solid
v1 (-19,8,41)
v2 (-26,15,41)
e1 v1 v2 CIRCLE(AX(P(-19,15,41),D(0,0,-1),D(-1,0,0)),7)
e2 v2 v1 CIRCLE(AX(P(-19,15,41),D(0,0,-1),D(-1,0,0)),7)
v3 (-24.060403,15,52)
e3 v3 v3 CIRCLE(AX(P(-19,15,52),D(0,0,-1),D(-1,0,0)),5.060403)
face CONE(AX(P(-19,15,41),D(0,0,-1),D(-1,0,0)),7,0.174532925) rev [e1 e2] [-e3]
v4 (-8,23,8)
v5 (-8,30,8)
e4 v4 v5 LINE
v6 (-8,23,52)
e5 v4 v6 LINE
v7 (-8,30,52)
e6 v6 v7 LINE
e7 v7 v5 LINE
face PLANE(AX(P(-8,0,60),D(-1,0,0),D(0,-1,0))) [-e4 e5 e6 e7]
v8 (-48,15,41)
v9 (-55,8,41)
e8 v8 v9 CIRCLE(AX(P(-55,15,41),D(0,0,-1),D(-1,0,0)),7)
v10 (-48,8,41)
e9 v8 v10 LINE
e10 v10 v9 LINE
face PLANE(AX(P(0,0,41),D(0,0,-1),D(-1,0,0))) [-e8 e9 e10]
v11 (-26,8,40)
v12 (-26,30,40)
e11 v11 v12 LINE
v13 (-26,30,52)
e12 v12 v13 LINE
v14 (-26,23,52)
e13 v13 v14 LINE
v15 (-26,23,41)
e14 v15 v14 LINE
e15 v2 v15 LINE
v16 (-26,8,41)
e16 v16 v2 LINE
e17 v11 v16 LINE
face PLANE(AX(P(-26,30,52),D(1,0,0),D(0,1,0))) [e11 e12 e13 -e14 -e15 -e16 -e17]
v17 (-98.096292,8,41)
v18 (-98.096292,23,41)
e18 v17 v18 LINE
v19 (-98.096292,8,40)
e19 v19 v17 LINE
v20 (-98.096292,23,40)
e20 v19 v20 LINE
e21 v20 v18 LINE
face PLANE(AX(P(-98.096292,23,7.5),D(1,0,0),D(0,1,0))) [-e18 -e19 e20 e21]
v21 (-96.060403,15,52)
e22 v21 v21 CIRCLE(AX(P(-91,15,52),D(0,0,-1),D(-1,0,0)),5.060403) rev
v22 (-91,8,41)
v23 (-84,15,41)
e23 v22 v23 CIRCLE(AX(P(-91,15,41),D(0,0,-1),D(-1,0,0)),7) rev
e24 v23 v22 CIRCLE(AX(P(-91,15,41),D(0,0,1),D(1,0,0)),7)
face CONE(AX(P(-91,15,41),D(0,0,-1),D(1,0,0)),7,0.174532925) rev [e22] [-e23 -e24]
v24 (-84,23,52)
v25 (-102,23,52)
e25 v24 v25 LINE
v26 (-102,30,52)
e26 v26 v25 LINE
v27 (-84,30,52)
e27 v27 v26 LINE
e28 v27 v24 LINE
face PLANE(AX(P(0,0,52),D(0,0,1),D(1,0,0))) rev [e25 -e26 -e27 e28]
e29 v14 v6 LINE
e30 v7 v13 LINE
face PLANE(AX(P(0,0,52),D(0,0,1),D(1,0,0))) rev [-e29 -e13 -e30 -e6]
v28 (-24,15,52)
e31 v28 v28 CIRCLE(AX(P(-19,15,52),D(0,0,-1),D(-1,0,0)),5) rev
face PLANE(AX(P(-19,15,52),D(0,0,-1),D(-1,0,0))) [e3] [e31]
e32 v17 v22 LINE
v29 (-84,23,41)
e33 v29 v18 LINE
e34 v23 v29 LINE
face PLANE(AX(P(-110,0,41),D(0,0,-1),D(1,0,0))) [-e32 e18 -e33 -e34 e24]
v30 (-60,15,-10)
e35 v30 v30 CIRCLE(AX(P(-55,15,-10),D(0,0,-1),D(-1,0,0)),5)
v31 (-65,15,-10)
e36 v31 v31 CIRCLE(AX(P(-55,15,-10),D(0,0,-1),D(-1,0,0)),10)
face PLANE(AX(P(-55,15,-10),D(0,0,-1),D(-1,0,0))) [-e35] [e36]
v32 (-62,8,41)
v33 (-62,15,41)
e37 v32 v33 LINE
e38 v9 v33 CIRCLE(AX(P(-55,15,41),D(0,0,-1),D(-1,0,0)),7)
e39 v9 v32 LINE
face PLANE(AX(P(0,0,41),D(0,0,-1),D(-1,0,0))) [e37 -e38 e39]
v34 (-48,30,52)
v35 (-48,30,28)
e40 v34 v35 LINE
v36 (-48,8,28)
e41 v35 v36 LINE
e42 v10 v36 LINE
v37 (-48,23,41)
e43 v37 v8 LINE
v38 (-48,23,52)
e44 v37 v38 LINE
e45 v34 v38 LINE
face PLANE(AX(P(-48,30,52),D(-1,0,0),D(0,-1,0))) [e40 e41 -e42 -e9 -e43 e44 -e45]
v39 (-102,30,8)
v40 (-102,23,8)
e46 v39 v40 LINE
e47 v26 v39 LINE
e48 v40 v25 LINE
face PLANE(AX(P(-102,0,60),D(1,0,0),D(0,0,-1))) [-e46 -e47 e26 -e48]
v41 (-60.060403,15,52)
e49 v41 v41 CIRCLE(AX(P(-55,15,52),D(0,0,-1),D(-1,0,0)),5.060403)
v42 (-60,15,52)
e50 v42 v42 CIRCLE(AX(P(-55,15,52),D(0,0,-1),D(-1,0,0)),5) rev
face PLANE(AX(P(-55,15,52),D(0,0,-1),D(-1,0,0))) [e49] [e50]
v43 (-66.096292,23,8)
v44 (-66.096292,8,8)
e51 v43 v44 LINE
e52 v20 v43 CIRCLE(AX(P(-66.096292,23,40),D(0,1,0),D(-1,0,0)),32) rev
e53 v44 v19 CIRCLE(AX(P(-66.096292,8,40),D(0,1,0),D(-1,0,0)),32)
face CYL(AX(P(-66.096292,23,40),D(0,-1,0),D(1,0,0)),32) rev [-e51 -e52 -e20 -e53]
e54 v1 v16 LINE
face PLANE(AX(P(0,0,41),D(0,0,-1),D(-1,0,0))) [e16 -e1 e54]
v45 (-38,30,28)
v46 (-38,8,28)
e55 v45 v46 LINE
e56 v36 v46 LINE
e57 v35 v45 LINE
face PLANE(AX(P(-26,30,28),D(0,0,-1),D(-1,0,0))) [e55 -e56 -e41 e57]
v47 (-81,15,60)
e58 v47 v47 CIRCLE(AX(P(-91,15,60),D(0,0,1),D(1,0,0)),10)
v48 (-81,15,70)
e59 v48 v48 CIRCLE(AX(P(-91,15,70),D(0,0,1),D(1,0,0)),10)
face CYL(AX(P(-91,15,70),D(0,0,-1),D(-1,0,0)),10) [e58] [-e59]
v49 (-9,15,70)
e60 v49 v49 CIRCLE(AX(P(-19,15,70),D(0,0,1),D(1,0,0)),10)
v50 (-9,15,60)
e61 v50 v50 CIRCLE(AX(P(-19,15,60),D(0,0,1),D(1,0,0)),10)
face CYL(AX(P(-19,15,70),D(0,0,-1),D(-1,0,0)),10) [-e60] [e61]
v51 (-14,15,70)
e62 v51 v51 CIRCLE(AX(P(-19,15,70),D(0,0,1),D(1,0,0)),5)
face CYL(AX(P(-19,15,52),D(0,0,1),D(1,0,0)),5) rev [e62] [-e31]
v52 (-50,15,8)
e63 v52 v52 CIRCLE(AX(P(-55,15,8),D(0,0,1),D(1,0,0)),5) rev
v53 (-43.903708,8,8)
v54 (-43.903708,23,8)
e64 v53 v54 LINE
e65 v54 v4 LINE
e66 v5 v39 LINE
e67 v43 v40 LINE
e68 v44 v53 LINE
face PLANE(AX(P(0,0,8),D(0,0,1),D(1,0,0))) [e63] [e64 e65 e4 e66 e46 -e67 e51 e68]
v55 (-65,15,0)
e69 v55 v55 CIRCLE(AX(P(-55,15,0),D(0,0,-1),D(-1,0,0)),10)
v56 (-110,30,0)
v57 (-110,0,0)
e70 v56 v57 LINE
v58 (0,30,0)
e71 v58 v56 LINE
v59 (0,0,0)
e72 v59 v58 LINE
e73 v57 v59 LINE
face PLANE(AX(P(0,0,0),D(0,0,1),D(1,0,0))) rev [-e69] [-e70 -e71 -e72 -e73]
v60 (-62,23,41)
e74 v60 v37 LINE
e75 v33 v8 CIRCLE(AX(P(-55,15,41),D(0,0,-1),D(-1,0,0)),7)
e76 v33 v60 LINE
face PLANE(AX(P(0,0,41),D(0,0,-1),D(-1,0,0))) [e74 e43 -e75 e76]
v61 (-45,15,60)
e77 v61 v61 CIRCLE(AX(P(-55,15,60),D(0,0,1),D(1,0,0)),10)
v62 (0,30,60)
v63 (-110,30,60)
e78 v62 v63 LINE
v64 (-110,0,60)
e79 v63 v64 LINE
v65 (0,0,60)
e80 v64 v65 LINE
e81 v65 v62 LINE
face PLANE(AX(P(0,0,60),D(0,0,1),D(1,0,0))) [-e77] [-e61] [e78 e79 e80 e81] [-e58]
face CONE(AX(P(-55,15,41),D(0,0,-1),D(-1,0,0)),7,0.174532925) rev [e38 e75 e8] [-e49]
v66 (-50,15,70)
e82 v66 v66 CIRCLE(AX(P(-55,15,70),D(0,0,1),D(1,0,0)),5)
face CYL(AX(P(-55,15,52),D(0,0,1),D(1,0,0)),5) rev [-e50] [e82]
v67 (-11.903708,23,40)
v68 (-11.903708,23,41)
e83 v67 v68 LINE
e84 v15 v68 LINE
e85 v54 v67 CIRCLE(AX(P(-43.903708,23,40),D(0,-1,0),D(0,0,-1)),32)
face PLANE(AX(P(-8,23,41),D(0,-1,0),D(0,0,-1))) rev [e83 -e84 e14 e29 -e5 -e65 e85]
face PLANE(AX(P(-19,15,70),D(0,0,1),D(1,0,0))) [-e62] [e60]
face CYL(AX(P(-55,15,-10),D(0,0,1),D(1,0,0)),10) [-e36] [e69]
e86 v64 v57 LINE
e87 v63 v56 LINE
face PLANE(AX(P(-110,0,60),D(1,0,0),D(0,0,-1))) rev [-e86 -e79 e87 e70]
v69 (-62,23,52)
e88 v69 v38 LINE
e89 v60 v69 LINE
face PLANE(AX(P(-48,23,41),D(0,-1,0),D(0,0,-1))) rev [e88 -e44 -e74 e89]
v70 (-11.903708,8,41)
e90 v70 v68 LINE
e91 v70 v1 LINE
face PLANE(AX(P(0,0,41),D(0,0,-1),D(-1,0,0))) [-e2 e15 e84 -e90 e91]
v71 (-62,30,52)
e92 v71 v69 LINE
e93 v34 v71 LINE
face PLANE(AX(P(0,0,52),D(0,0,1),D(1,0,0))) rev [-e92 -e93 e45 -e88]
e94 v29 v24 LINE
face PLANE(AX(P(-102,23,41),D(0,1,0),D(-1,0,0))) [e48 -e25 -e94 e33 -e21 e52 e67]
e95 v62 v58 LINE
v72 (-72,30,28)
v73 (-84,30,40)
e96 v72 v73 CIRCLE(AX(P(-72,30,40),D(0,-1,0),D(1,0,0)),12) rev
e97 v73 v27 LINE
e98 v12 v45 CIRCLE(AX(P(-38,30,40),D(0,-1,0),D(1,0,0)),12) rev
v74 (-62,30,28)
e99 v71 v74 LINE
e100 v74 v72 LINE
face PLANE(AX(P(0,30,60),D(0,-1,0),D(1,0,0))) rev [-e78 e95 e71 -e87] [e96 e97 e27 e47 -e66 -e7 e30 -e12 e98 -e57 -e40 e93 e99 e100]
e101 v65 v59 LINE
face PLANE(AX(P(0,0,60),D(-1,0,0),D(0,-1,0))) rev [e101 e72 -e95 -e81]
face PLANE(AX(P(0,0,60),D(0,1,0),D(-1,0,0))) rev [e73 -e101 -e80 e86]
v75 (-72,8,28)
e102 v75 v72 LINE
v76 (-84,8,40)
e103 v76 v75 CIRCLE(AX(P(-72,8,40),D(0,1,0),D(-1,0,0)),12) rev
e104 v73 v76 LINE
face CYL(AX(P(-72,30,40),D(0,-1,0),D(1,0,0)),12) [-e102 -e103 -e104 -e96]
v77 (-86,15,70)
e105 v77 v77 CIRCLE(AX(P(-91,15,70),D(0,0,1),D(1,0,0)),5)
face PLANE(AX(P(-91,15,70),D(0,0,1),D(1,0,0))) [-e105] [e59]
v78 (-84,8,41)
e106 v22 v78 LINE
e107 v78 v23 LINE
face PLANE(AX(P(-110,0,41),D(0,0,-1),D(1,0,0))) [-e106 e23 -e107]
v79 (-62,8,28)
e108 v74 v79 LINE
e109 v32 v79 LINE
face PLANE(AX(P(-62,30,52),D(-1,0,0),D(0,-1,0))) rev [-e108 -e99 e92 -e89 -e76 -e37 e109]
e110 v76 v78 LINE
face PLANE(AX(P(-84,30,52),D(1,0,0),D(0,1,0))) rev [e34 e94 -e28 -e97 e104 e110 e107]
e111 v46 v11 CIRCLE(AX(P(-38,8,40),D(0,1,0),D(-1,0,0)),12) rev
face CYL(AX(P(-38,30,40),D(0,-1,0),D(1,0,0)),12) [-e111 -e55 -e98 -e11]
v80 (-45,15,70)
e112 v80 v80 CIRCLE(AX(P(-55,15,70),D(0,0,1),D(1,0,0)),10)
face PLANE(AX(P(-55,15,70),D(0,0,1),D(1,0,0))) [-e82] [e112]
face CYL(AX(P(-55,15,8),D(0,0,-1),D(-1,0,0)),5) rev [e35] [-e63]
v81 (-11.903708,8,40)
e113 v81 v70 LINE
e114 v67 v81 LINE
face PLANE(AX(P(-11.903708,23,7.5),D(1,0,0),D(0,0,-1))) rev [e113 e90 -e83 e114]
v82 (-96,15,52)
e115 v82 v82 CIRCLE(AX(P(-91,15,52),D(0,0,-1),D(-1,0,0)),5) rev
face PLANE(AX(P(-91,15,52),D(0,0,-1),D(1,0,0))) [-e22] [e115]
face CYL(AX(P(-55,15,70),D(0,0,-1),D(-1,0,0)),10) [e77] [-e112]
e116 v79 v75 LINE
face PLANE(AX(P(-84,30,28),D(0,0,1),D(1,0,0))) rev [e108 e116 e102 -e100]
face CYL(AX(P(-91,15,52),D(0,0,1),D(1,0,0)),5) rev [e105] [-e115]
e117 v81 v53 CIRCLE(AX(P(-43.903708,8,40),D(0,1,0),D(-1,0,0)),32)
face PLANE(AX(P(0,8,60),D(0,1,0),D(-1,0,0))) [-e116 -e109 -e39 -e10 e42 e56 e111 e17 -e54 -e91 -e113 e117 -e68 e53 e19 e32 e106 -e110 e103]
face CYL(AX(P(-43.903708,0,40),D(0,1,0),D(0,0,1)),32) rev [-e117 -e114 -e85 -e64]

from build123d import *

# Parameters (mm, degrees)
SKETCH1_W               = 110
SKETCH1_H               = 30
BOSS_EXTRUDE1_DEPTH     = 60
SKETCH5_R               = 10
BOSS_EXTRUDE3_DEPTH     = 10
SKETCH8_R               = 5
CUT_EXTRUDE2_DEPTH      = 18
BOSS_EXTRUDE4_START     = 10
SKETCH6_R               = 10
BOSS_EXTRUDE4_DEPTH     = 10
CUT_EXTRUDE3_START      = -18
SKETCH7_R               = 5
CUT_EXTRUDE3_DEPTH      = 18
SHELL6_START            = 8
SHELL6_OUTLINE_W        = 94
SHELL6_OUTLINE_H        = 22
SHELL6_DEPTH            = 44
SKETCH9_W               = 22
SKETCH9_H               = 24
BOSS_EXTRUDE5_DEPTH     = 22
FILLET2_R               = 12
SKETCH12_W              = 14
SKETCH12_H              = 16
BOSS_EXTRUDE8_DEPTH     = 11
SKETCH13_R              = 7
CUT_EXTRUDE4_DEPTH      = 11
CUT_EXTRUDE4_DRAFT      = -10
SKETCH14_W              = 18
SKETCH14_H              = 15
BOSS_EXTRUDE9_DEPTH     = 11
SKETCH16_R              = 7
CUT_EXTRUDE5_DEPTH      = 11
CUT_EXTRUDE5_DRAFT      = -10
SKETCH19_W              = 3.903707596
SKETCH19_H              = 15
BOSS_EXTRUDE11_DEPTH    = 33.5
FILLET3_R               = 32
MIRROR5_COPY_1_SKETCH_R = 7
MIRROR5_COPY_1_DEPTH    = 11
MIRROR5_COPY_1_DRAFT    = -10
FILLET3_OF_MIRROR5_R    = 32


# Read off the part's stored shape, not the designer's step: Shell6
with BuildPart() as part:
    # Sketch1 → Boss-Extrude1 (new body)
    with BuildSketch(Plane.XY):
        with Locations((-55, 15)):
            Rectangle(SKETCH1_W, SKETCH1_H)
    extrude(amount=BOSS_EXTRUDE1_DEPTH)

    # Sketch5 → Boss-Extrude3 (add)
    with BuildSketch(Plane.XY.offset(60)):
        with Locations((-91, 15)):
            Circle(SKETCH5_R)
        with Locations((-55, 15)):
            Circle(SKETCH5_R)
        with Locations((-19, 15)):
            Circle(SKETCH5_R)
    extrude(amount=BOSS_EXTRUDE3_DEPTH)

    # Sketch8 → Cut-Extrude2 (cut)
    with BuildSketch(Plane.XY.offset(70)):
        with Locations((-91, 15)):
            Circle(SKETCH8_R)
        with Locations((-55, 15)):
            Circle(SKETCH8_R)
        with Locations((-19, 15)):
            Circle(SKETCH8_R)
    extrude(amount=-CUT_EXTRUDE2_DEPTH, mode=Mode.SUBTRACT)

    # Sketch6 → Boss-Extrude4 (add)
    with BuildSketch(Plane(origin=(0, 0, 0), x_dir=(-1, 0, 0), z_dir=(0, 0, -1)).offset(BOSS_EXTRUDE4_START)):
        with Locations(Location((55, 15, 0), (0, 0, 180))):
            Circle(SKETCH6_R)
    extrude(amount=-BOSS_EXTRUDE4_DEPTH)

    # Sketch7 → Cut-Extrude3 (cut)
    with BuildSketch(Plane(origin=(0, 0, -10), x_dir=(-1, 0, 0), z_dir=(0, 0, -1)).offset(CUT_EXTRUDE3_START)):
        with Locations(Location((55, 15, 0), (0, 0, 180))):
            Circle(SKETCH7_R)
    extrude(amount=CUT_EXTRUDE3_DEPTH, mode=Mode.SUBTRACT)

    # Shell6 outline → Shell6 (cut)
    with BuildSketch(Plane.XY.offset(SHELL6_START)):
        with Locations((-55, 19)):
            Rectangle(SHELL6_OUTLINE_W, SHELL6_OUTLINE_H)
    extrude(amount=SHELL6_DEPTH, mode=Mode.SUBTRACT)

    # Sketch9 → Boss-Extrude5 (add)
    with BuildSketch(Plane(origin=(0, 8, 0), x_dir=(1, 0, 0), z_dir=(0, 1, 0))):
        with Locations((-73, -40)):
            Rectangle(SKETCH9_W, SKETCH9_H)
    boss_extrude5 = extrude(amount=BOSS_EXTRUDE5_DEPTH)

    # Mirror1: Boss-Extrude5 across plane
    add(boss_extrude5.mirror(Plane.ZY.offset(55)))

    # Fillet2
    fillet2_edges = [part.edges().sort_by_distance(p)[0] for p in [
        (-84, 19, 28),
        (-26, 19, 28),
    ]]
    fillet(fillet2_edges, radius=FILLET2_R)

    # Sketch12 → Boss-Extrude8 (add)
    with BuildSketch(Plane(origin=(0, 0, 52), x_dir=(-1, 0, 0), z_dir=(0, 0, -1))):
        with Locations((55, 15)):
            Rectangle(SKETCH12_W, SKETCH12_H)
    extrude(amount=BOSS_EXTRUDE8_DEPTH)


with BuildPart() as cut_extrude4_tool:
    # Sketch13 → Cut-Extrude4 (with draft: the straight prism first)
    with BuildSketch(Plane(origin=(0, 0, 41), x_dir=(-1, 0, 0), z_dir=(0, 0, -1))):
        with Locations((55, 15)):
            Circle(SKETCH13_R)
    extrude(amount=-CUT_EXTRUDE4_DEPTH)
    # Cut-Extrude4: the draft: its side faces are tilted about the plane it starts from
    cut_extrude4_sides = [cut_extrude4_tool.faces().sort_by_distance(p)[0] for p in [
        (-48, 15, 46.5),
    ]]
    draft(cut_extrude4_sides, Plane(origin=(0, 0, 41), x_dir=(-1, 0, 0), z_dir=(0, 0, -1)), CUT_EXTRUDE4_DRAFT)


with BuildPart() as part_1:
    add(part.part)

    # Cut-Extrude4: cut by cut_extrude4_tool
    add(cut_extrude4_tool.part, mode=Mode.SUBTRACT)

    # Sketch14 → Boss-Extrude9 (add)
    with BuildSketch(Plane(origin=(0, 0, 52), x_dir=(-1, 0, 0), z_dir=(0, 0, -1))):
        with Locations((17, 15.5)):
            Rectangle(SKETCH14_W, SKETCH14_H)
    boss_extrude9 = extrude(amount=BOSS_EXTRUDE9_DEPTH)


with BuildPart() as cut_extrude5_tool:
    # Sketch16 → Cut-Extrude5 (with draft: the straight prism first)
    with BuildSketch(Plane(origin=(0, 0, 41), x_dir=(-1, 0, 0), z_dir=(0, 0, -1))):
        with Locations((19, 15)):
            Circle(SKETCH16_R)
    extrude(amount=-CUT_EXTRUDE5_DEPTH)
    # Cut-Extrude5: the draft: its side faces are tilted about the plane it starts from
    cut_extrude5_sides = [cut_extrude5_tool.faces().sort_by_distance(p)[0] for p in [
        (-12, 15, 46.5),
    ]]
    draft(cut_extrude5_sides, Plane(origin=(0, 0, 41), x_dir=(-1, 0, 0), z_dir=(0, 0, -1)), CUT_EXTRUDE5_DRAFT)


with BuildPart() as part_2:
    add(part_1.part)

    # Cut-Extrude5: cut by cut_extrude5_tool
    add(cut_extrude5_tool.part, mode=Mode.SUBTRACT)

    # Sketch19 → Boss-Extrude11 (add)
    with BuildSketch(Plane(origin=(0, 0, 41), x_dir=(-1, 0, 0), z_dir=(0, 0, -1))):
        with Locations((9.951853798, 15.5)):
            Rectangle(SKETCH19_W, SKETCH19_H)
    boss_extrude11 = extrude(amount=BOSS_EXTRUDE11_DEPTH)

    # Fillet3
    fillet3_edges = [part_2.edges().sort_by_distance(p)[0] for p in [
        (-11.903707596, 15.5, 8),
    ]]
    fillet(fillet3_edges, radius=FILLET3_R)

    # Mirror5: Boss-Extrude9, Boss-Extrude11 across plane
    add(boss_extrude9.mirror(Plane.ZY.offset(55)))
    add(boss_extrude11.mirror(Plane.ZY.offset(55)))


with BuildPart() as mirror5_copy_1_tool:
    # Mirror5 copy 1 sketch → Mirror5 copy 1 (with draft: the straight prism first)
    with BuildSketch(Plane(origin=(-110, 0, 41), x_dir=(1, 0, 0), z_dir=(0, 0, -1))):
        with Locations((19, -15)):
            Circle(MIRROR5_COPY_1_SKETCH_R)
    extrude(amount=-MIRROR5_COPY_1_DEPTH)
    # Mirror5 copy 1: the draft: its side faces are tilted about the plane it starts from
    mirror5_copy_1_sides = [mirror5_copy_1_tool.faces().sort_by_distance(p)[0] for p in [
        (-98, 15, 46.5),
    ]]
    draft(mirror5_copy_1_sides, Plane(origin=(-110, 0, 41), x_dir=(1, 0, 0), z_dir=(0, 0, -1)), MIRROR5_COPY_1_DRAFT)


with BuildPart() as part_3:
    add(part_2.part)

    # Mirror5 copy 1: cut by mirror5_copy_1_tool
    add(mirror5_copy_1_tool.part, mode=Mode.SUBTRACT)

    # Fillet3 of Mirror5
    fillet3_of_mirror5_edges = [part_3.edges().sort_by_distance(p)[0] for p in [
        (-98.096292404, 15.5, 8),
    ]]
    fillet(fillet3_of_mirror5_edges, radius=FILLET3_OF_MIRROR5_R)


solid = part_3.part
